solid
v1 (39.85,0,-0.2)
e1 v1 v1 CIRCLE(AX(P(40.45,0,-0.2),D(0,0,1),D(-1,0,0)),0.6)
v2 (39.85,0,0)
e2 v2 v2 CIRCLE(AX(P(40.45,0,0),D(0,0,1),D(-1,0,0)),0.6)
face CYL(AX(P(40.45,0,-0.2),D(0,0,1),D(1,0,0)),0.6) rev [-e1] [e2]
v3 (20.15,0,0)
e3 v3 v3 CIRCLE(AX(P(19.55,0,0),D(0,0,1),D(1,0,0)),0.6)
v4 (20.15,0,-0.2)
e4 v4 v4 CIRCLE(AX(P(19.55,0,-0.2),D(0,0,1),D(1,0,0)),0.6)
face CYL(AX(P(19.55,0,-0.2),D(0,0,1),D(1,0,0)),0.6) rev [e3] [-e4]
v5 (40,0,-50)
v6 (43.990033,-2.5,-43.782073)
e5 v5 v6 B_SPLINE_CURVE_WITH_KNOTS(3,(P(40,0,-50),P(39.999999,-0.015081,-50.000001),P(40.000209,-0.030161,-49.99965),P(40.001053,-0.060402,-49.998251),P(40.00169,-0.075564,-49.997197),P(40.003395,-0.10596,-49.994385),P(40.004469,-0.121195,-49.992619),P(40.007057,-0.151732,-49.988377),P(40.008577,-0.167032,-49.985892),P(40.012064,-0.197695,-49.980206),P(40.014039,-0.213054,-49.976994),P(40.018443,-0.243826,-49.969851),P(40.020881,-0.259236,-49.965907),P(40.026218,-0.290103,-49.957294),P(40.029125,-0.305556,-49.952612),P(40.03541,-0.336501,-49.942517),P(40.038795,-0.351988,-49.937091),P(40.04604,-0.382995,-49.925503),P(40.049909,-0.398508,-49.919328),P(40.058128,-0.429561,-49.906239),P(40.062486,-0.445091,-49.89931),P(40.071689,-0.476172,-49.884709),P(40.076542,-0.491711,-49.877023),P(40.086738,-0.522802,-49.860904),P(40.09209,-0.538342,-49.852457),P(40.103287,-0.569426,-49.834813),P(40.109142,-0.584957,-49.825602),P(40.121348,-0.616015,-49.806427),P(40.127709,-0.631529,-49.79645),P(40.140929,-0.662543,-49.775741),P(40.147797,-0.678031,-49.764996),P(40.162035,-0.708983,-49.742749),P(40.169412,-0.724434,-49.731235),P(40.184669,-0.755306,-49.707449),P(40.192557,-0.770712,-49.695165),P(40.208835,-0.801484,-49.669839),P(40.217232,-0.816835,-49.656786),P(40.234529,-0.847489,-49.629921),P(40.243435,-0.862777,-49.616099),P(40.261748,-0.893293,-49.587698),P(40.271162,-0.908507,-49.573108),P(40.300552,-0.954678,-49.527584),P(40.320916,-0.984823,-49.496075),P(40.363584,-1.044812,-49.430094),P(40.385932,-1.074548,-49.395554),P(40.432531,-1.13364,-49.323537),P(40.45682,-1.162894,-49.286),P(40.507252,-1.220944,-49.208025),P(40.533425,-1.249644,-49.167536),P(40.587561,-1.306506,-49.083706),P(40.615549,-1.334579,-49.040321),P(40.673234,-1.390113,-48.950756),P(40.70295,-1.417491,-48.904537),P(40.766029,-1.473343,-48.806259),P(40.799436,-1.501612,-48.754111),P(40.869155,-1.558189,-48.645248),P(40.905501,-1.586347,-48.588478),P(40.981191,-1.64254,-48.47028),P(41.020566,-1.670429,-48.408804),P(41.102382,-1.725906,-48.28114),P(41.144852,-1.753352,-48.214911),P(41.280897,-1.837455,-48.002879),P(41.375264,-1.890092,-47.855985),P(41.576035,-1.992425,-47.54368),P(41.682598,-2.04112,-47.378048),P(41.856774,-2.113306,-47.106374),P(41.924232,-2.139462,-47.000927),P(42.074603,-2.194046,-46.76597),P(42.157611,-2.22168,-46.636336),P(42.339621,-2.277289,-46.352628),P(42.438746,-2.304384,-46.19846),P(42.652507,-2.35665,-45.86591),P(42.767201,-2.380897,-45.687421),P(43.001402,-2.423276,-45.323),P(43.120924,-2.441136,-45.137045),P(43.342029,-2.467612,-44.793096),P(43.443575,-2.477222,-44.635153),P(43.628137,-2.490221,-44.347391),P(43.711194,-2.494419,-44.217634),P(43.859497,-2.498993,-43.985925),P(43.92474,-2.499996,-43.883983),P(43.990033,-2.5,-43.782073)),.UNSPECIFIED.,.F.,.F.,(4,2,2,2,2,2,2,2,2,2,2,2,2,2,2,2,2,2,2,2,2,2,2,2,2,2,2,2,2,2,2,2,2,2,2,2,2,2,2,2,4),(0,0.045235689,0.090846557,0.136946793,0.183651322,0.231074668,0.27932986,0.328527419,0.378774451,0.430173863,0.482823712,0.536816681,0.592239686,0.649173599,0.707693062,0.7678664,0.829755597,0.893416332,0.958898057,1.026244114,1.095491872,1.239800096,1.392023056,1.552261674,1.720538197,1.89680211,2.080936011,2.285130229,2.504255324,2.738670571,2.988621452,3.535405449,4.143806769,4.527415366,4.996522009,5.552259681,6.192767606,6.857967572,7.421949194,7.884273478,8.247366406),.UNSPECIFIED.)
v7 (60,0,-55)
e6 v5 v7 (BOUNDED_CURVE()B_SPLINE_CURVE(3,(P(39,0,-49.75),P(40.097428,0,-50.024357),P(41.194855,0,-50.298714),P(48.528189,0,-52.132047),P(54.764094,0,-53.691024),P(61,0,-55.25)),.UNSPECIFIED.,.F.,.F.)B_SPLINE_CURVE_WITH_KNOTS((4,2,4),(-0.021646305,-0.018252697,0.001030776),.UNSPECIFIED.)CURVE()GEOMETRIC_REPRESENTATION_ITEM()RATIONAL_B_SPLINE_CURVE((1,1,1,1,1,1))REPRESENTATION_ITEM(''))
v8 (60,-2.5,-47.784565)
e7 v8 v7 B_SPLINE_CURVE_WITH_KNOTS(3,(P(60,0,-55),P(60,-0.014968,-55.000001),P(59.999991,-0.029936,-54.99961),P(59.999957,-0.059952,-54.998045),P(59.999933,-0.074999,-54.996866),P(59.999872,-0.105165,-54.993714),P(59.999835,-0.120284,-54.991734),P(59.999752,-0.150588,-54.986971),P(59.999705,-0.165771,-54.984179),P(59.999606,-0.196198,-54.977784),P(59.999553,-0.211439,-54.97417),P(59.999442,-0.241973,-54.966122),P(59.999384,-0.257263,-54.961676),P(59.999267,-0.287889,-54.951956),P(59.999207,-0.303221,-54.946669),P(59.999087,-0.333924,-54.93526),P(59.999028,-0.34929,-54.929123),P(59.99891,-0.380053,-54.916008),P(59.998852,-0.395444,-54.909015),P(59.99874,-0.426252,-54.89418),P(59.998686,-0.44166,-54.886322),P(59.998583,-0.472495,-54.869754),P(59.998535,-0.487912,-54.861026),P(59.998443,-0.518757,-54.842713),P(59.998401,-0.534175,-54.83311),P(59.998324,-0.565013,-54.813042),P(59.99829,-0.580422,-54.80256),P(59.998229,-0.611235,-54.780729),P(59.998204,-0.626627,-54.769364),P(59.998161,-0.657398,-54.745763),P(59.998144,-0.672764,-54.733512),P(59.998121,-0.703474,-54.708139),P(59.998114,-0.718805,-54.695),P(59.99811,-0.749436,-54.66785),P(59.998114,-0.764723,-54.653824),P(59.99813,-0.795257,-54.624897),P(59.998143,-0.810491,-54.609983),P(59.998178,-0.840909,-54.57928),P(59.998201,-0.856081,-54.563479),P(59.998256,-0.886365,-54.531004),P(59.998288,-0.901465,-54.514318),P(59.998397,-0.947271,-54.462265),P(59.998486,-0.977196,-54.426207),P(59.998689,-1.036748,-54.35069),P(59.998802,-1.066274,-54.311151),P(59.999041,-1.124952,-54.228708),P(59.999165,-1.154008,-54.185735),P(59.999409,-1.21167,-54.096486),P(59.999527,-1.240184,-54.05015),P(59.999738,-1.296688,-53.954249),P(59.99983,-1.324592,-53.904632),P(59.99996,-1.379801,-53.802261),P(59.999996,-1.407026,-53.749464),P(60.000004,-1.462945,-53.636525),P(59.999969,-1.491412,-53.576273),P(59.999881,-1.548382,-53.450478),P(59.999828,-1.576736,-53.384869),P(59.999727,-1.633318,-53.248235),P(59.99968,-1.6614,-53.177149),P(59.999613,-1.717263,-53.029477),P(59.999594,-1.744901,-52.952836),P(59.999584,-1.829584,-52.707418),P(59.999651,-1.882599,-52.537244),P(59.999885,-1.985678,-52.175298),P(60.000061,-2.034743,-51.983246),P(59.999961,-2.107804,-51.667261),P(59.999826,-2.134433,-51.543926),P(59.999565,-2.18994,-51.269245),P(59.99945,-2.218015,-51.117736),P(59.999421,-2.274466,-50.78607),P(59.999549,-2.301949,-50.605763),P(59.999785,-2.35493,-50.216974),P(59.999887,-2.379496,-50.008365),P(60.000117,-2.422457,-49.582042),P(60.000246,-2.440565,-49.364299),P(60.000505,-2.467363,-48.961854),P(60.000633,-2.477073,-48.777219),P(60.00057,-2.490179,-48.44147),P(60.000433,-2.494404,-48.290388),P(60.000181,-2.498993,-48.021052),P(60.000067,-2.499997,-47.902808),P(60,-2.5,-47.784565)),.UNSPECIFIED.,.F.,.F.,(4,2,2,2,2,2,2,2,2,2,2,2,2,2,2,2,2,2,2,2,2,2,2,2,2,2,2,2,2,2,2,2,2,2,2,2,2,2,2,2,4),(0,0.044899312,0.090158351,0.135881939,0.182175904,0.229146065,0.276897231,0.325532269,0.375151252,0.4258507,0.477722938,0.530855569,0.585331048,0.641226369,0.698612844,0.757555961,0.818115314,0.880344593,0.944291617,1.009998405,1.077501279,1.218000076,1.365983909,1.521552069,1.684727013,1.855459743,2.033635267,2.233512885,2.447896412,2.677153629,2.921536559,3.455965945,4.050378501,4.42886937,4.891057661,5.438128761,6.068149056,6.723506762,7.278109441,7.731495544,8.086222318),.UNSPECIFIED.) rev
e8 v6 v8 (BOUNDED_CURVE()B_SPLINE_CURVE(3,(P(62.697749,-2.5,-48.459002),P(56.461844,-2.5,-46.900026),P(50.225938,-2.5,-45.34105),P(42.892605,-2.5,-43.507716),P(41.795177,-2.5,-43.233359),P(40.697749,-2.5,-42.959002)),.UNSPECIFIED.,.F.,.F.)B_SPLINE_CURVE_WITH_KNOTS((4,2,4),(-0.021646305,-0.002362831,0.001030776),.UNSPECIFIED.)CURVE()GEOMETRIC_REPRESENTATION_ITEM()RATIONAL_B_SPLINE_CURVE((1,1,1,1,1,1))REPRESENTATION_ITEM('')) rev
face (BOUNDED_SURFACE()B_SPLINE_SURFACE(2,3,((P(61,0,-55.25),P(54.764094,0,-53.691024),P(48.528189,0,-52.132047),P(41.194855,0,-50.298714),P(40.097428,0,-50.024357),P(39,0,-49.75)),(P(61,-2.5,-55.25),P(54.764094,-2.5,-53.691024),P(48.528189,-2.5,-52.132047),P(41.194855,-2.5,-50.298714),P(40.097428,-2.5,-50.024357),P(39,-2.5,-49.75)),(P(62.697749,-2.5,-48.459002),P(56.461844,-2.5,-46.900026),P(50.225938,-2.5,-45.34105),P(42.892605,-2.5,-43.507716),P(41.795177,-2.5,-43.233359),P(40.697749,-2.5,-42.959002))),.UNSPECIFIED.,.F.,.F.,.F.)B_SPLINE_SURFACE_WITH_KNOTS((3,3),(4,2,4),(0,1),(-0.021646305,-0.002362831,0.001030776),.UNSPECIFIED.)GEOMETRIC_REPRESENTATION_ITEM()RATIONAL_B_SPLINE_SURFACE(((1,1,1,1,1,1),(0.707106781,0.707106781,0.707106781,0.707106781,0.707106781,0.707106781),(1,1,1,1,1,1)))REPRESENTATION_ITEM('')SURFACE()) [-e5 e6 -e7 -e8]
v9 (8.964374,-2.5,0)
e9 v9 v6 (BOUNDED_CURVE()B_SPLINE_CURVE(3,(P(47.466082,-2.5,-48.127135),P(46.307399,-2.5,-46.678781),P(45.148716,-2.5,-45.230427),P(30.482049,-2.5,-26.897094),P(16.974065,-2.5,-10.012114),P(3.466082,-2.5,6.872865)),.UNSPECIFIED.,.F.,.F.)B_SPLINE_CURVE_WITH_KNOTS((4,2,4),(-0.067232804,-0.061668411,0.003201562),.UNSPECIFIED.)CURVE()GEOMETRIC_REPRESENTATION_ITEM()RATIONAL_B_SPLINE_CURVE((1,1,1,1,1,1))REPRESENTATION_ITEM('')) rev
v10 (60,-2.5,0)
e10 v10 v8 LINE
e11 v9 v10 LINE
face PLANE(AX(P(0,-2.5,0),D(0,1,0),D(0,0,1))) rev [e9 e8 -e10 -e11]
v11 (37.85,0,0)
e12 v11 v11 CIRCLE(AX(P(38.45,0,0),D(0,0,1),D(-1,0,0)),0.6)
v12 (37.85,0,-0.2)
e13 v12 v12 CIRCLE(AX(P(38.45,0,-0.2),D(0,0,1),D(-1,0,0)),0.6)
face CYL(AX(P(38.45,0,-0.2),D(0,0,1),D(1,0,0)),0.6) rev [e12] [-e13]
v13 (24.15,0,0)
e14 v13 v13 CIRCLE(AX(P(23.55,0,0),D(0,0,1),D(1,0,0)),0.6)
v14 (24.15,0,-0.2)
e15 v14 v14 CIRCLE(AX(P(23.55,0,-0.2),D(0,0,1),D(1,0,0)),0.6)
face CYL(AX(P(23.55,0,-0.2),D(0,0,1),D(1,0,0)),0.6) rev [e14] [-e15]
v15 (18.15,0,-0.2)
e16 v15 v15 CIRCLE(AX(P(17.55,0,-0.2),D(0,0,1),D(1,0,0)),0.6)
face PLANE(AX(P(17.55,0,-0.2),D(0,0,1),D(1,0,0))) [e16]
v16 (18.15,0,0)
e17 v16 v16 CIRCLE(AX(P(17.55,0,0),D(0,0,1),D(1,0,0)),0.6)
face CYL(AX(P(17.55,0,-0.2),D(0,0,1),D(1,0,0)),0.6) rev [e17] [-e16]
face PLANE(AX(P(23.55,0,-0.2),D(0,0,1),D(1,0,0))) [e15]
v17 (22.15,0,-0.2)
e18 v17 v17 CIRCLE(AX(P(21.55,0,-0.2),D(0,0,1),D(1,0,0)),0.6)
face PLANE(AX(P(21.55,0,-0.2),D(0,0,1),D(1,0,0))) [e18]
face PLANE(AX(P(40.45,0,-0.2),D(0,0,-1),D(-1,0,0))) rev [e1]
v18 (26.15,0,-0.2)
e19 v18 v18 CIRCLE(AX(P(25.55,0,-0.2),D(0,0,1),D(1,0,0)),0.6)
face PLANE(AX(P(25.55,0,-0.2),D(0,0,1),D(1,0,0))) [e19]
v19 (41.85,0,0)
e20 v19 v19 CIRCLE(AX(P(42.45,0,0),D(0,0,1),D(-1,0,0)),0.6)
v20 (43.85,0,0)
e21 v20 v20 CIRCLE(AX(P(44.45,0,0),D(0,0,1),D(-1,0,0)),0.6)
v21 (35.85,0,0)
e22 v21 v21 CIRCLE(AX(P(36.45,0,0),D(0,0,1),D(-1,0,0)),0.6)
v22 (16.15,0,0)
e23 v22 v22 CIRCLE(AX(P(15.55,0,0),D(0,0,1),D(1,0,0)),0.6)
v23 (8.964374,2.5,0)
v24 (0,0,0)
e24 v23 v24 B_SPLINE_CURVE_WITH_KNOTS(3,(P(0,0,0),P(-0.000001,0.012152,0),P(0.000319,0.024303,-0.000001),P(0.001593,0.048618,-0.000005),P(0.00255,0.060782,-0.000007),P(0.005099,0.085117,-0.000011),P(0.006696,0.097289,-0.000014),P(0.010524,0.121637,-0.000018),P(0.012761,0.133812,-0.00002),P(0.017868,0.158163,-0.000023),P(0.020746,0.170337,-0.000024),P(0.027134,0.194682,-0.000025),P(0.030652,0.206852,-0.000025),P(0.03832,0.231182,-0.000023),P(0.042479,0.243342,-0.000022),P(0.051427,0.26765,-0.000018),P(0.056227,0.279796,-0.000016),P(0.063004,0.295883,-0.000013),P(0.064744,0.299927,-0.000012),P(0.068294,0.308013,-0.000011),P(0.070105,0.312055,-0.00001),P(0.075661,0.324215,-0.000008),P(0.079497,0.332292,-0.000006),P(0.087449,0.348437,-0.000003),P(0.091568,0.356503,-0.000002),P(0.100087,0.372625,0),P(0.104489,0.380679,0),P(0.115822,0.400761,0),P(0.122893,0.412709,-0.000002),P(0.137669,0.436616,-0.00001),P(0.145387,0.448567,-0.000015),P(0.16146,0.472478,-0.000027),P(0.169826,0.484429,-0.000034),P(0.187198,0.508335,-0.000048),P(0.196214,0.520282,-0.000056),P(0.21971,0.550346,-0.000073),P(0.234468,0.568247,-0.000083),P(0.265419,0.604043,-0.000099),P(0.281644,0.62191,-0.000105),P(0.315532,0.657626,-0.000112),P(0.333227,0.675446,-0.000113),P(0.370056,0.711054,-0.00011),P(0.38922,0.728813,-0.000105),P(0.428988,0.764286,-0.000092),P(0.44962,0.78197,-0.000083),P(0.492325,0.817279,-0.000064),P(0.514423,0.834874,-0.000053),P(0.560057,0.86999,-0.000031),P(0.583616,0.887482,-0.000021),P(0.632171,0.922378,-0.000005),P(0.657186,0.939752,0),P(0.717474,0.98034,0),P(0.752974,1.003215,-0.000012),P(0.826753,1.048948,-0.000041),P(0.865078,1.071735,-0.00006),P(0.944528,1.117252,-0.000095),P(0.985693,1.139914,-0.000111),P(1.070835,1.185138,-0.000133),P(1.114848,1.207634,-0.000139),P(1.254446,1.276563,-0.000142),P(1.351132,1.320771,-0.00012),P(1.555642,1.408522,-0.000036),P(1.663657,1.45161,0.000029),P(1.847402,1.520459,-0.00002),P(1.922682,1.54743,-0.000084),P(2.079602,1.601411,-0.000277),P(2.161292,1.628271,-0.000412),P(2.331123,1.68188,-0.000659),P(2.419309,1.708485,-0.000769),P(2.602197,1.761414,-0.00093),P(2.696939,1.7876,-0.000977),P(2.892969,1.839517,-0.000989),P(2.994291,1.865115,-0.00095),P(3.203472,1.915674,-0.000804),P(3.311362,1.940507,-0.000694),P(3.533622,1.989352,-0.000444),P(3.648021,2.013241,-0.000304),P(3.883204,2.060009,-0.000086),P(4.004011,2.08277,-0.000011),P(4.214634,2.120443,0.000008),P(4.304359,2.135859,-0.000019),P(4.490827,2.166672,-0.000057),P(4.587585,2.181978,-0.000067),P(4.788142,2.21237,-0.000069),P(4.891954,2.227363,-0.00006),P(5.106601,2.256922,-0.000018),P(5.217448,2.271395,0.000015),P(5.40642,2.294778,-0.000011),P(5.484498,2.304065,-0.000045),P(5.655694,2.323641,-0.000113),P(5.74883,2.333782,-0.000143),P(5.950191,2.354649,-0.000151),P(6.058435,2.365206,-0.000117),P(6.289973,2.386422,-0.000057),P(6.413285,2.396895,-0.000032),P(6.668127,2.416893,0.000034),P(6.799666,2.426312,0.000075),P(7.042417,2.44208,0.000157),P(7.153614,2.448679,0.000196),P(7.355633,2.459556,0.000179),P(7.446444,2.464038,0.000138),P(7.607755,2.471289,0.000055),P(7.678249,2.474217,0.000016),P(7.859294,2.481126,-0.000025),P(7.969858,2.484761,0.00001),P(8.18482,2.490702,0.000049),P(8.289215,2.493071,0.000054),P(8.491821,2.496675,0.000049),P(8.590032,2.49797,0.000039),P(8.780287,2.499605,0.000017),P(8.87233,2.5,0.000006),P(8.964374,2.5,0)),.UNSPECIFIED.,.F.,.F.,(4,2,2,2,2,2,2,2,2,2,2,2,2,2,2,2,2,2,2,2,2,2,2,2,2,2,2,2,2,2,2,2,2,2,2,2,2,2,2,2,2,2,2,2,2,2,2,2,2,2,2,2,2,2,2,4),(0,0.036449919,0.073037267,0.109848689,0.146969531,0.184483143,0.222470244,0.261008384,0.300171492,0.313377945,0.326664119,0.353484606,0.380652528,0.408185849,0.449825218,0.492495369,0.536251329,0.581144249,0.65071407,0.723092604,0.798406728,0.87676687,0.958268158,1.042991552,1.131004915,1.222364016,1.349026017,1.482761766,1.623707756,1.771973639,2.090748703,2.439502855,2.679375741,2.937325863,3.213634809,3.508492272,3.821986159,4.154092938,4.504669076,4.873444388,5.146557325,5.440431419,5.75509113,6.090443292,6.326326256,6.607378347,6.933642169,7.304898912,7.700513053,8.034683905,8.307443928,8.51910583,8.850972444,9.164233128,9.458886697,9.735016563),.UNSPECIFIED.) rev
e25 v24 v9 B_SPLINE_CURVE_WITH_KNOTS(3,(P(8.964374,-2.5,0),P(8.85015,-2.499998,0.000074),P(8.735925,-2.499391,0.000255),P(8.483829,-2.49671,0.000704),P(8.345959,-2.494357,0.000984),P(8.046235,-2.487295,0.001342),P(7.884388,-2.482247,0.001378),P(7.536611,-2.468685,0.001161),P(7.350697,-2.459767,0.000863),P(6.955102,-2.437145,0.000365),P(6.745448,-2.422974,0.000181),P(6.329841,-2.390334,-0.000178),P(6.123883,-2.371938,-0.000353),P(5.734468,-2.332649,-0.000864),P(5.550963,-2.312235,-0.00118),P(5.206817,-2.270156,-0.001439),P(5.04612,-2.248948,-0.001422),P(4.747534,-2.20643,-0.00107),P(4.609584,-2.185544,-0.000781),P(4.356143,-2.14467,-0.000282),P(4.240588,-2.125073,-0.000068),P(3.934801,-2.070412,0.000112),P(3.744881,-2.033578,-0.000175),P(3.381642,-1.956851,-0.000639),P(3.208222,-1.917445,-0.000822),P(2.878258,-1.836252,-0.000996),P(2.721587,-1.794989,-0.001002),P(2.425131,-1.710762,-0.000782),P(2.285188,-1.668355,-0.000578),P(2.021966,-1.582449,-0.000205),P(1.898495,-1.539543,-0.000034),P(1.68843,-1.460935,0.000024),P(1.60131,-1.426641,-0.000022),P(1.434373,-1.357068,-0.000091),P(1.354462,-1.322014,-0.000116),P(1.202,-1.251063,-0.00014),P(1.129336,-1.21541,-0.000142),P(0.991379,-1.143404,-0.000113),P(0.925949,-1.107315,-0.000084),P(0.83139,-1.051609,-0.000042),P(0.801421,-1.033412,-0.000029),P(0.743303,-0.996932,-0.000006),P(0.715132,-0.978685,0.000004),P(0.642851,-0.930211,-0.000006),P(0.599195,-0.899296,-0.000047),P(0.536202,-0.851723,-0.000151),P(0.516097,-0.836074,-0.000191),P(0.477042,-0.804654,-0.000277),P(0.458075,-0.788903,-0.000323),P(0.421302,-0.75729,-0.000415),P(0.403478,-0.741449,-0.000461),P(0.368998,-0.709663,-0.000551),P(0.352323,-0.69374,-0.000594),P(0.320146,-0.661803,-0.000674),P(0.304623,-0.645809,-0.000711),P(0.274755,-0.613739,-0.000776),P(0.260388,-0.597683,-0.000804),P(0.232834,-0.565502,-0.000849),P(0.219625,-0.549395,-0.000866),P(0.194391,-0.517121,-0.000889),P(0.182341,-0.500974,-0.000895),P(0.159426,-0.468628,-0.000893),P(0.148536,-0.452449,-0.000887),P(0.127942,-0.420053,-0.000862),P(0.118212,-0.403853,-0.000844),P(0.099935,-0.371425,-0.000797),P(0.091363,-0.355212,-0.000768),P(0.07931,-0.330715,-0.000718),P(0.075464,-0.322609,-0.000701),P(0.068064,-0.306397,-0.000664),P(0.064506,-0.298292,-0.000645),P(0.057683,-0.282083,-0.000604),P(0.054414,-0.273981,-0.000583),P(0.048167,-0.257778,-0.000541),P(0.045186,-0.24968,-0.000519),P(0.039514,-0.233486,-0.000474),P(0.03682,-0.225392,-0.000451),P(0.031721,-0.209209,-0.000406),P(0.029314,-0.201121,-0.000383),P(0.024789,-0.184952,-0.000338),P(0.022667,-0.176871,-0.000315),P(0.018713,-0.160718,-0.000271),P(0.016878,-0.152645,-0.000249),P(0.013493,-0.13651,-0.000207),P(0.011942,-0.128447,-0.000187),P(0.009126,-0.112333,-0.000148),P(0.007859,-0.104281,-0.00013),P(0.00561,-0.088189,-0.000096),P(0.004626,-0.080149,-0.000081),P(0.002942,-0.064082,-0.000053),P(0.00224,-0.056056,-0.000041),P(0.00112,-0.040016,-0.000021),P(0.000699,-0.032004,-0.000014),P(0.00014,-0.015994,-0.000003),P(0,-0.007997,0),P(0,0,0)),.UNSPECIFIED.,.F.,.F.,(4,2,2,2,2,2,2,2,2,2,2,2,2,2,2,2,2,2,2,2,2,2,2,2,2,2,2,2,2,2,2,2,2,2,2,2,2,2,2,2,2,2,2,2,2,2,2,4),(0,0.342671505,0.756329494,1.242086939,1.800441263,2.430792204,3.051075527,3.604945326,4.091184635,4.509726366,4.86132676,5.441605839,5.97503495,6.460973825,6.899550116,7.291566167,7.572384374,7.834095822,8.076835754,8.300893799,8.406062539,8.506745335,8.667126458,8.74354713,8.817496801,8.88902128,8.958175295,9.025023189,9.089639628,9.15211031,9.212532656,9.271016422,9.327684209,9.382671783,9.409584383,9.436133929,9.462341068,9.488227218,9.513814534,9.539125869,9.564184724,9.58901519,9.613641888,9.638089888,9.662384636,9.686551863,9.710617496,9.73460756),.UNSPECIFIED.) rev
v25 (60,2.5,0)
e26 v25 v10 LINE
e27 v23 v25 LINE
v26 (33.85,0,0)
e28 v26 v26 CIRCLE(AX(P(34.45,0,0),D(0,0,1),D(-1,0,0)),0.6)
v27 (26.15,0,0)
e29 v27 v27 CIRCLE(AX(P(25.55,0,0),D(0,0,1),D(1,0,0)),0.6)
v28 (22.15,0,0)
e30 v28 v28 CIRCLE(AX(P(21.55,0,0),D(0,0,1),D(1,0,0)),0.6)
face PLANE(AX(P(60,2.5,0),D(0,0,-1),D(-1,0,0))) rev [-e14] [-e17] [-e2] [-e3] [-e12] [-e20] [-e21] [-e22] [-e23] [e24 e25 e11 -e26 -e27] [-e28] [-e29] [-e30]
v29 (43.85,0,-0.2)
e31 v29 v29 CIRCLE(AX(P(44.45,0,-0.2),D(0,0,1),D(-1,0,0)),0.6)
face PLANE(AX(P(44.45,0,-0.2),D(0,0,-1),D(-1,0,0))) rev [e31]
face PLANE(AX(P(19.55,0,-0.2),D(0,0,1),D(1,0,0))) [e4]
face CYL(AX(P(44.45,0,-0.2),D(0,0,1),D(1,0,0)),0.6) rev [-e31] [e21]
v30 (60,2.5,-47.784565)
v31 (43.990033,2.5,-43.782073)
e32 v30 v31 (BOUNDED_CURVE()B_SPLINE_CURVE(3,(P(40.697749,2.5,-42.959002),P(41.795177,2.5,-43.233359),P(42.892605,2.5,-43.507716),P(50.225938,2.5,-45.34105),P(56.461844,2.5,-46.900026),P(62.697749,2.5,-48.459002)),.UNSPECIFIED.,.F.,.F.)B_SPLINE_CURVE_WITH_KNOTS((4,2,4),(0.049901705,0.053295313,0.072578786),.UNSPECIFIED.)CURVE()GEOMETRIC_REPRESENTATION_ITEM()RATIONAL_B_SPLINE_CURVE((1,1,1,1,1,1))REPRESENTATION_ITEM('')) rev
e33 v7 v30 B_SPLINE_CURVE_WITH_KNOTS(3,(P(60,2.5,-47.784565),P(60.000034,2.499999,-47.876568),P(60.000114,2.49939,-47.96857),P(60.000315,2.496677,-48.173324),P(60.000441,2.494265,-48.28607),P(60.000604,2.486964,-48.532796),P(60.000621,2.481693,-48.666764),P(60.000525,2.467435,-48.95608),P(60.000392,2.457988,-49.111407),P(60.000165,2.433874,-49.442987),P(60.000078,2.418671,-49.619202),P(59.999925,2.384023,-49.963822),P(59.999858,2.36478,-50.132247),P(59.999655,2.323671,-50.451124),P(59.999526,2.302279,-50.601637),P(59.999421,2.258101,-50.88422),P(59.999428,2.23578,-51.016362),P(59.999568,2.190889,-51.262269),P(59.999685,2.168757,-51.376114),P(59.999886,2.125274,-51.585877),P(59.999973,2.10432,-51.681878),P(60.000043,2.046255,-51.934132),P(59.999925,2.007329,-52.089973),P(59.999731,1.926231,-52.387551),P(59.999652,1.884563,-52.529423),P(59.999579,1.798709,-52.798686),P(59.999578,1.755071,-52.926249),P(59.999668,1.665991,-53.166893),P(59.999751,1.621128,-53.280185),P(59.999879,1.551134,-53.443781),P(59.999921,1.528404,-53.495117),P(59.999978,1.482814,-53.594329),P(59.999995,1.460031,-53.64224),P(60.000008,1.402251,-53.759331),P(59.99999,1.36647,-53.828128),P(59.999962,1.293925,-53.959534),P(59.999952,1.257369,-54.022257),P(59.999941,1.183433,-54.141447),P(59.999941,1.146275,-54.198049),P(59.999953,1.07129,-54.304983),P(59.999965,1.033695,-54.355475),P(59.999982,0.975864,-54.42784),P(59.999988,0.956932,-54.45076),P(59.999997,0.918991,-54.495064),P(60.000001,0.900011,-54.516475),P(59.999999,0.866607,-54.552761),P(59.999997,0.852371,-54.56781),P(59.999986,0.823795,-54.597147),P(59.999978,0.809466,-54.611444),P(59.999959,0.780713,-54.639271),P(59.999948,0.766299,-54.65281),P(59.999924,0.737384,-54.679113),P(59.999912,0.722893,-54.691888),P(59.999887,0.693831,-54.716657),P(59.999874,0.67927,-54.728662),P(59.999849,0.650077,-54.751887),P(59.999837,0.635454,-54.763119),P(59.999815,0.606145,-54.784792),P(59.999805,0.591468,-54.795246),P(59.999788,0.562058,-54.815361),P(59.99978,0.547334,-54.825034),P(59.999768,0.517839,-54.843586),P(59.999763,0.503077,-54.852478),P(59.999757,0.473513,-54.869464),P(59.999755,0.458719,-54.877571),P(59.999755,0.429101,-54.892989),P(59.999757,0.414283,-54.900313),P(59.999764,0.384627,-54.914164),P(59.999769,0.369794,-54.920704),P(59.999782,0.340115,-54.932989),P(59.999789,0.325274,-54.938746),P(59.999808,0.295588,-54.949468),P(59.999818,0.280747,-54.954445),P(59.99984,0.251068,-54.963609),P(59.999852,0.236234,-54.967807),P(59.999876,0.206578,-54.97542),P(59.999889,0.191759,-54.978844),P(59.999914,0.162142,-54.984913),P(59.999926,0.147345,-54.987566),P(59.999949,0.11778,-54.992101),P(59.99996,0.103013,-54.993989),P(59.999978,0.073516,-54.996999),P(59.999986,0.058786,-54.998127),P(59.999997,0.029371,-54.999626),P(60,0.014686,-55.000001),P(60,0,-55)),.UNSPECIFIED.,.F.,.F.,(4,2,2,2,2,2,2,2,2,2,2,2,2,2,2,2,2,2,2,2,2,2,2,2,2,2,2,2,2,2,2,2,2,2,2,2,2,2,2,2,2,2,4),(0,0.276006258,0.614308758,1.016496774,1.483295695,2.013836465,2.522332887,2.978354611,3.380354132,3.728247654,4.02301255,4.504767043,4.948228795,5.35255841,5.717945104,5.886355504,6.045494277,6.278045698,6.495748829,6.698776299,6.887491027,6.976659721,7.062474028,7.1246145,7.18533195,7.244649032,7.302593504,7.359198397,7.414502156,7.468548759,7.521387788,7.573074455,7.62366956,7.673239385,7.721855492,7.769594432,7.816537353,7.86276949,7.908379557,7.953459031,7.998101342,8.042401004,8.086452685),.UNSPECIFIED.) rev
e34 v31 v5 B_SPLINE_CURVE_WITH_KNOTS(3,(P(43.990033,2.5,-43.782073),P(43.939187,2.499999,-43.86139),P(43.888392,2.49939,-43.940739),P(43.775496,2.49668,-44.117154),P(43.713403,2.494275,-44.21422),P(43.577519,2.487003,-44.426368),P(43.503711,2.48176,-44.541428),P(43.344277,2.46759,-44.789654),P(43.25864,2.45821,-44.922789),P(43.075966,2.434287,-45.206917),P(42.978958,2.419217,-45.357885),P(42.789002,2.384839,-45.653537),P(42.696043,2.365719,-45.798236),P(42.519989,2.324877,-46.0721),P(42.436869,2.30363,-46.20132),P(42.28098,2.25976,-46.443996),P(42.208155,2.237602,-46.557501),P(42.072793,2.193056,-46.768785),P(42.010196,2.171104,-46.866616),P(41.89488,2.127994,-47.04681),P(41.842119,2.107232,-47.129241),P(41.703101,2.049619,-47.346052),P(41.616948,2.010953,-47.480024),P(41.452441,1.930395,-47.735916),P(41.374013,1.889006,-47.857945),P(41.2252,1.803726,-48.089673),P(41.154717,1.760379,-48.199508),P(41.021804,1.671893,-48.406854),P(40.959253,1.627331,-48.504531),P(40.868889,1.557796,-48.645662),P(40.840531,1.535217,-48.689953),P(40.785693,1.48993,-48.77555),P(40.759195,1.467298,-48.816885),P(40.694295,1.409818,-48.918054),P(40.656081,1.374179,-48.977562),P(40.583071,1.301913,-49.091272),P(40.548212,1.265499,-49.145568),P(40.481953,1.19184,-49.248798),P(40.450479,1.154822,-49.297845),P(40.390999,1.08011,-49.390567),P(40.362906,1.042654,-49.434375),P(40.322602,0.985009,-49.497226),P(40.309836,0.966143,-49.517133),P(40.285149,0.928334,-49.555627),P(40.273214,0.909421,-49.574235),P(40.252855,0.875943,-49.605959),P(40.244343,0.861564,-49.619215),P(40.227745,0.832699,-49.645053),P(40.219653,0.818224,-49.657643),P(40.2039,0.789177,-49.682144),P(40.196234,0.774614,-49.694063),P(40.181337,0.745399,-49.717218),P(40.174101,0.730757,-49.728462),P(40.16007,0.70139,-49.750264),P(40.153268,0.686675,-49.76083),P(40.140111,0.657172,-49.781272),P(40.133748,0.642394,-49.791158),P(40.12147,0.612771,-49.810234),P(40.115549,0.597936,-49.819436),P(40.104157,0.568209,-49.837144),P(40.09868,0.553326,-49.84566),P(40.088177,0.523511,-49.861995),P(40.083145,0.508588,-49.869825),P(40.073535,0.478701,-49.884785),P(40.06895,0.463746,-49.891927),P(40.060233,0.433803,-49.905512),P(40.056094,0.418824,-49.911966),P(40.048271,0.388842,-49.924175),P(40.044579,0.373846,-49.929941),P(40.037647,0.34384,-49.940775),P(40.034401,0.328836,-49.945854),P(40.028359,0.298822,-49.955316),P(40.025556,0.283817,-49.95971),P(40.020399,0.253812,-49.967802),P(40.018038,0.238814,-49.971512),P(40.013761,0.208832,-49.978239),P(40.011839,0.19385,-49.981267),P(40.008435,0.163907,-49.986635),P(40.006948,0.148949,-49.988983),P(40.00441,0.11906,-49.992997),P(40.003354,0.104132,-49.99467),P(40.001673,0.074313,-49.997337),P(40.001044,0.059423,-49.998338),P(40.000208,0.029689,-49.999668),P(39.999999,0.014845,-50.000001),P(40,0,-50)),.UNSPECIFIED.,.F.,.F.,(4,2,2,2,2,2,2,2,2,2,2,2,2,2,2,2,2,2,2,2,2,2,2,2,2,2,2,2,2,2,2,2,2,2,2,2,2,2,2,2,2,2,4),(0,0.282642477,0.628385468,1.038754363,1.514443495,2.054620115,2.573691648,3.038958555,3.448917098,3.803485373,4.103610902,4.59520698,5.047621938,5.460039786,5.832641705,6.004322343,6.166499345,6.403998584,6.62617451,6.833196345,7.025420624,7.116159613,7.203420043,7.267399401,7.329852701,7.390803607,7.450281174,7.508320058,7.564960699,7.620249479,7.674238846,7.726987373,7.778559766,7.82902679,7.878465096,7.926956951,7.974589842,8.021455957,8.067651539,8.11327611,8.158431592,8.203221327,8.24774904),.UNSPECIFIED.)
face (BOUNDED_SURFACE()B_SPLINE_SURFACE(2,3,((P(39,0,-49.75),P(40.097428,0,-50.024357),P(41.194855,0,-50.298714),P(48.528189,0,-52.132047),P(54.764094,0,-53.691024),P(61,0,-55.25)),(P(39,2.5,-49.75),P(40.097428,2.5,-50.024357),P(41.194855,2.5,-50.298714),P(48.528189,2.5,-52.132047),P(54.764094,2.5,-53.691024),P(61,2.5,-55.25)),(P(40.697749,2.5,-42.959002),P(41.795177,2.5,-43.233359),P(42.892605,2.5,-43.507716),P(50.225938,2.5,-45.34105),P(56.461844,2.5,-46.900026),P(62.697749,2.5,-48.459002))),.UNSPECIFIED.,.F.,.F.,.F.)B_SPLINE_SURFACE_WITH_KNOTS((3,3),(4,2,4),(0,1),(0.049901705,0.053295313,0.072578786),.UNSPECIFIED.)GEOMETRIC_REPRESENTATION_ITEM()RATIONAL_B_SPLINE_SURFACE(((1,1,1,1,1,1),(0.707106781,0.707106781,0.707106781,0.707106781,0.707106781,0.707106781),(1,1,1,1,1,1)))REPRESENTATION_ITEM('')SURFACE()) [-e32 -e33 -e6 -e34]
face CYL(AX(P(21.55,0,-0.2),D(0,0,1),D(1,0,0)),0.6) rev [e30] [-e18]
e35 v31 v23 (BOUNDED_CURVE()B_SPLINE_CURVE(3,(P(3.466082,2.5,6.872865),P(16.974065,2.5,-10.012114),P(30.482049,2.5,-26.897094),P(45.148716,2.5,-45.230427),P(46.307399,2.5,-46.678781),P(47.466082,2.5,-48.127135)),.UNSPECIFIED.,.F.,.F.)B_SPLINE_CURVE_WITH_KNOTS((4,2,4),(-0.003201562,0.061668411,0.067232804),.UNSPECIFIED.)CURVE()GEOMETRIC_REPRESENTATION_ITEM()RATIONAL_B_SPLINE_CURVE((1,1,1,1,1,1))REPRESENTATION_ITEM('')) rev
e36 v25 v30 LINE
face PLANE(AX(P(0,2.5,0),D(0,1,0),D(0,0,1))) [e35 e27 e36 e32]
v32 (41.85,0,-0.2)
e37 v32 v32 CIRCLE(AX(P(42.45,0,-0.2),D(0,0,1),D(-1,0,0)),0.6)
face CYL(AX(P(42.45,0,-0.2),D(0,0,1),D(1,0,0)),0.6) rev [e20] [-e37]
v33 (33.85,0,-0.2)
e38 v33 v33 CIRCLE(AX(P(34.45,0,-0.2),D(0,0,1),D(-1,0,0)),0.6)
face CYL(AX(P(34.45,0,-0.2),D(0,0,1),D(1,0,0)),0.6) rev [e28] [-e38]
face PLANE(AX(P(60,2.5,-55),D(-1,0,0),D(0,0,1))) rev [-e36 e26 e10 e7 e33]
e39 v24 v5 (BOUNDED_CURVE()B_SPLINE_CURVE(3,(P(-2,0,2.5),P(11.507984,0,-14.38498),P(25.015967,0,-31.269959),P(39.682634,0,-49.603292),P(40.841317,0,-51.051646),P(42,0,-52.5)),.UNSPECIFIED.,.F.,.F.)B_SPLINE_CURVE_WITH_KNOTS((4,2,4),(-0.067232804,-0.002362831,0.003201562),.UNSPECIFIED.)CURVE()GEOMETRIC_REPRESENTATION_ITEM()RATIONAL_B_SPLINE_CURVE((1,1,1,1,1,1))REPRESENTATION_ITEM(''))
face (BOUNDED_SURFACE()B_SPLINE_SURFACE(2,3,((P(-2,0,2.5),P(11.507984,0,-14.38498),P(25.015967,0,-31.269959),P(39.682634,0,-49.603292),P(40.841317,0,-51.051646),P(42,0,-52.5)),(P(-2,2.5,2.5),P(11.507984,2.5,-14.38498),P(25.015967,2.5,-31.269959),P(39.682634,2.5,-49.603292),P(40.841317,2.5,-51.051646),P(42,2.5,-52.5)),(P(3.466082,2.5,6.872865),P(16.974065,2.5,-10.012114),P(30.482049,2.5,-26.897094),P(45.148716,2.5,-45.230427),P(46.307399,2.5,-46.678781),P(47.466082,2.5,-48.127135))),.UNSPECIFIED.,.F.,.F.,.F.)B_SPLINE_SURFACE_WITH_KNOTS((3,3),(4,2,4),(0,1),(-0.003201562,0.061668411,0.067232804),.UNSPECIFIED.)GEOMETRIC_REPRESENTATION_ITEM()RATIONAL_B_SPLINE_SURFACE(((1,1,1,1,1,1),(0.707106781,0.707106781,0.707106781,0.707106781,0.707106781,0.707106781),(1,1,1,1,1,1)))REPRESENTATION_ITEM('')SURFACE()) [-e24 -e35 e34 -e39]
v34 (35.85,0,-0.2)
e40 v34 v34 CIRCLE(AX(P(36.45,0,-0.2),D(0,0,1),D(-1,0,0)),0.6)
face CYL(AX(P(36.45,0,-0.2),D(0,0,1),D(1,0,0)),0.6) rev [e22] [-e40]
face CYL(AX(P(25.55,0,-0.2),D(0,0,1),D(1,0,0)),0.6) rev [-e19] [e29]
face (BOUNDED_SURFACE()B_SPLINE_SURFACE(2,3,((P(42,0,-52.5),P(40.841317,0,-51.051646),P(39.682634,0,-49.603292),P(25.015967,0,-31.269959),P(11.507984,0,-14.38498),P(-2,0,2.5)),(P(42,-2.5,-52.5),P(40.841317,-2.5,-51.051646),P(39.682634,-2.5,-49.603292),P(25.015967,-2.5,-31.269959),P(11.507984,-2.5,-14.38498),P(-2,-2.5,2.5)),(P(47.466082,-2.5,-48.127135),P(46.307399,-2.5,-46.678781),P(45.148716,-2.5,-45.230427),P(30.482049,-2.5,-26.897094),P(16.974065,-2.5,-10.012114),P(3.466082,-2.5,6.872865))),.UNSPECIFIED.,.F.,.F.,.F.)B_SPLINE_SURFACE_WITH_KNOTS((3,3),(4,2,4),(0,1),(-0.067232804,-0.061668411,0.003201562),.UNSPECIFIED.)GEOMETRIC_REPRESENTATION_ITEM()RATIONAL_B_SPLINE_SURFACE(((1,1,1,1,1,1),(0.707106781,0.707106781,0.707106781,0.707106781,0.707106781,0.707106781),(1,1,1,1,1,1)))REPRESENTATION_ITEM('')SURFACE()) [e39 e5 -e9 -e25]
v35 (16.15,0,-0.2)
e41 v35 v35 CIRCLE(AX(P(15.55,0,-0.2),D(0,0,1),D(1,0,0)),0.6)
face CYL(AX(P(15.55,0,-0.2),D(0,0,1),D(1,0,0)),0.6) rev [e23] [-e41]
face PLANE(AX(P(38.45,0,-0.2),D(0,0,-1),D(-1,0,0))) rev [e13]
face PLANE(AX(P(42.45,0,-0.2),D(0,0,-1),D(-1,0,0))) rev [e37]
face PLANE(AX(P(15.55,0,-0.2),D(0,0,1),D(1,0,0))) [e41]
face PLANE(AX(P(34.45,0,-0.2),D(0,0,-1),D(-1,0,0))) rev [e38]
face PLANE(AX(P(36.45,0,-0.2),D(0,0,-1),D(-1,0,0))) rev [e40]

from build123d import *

# Parameters (mm, degrees)
BOSS_EXTRUDE1_DEPTH = 2.5
FILLET3_SIZE        = 2.5
FILLET3_SIZE_2      = 7
FILLET4_SIZE        = 2.5
FILLET4_SIZE_2      = 7
SKETCH2_R           = 0.6
CUT_EXTRUDE1_DEPTH  = 0.2


with BuildPart() as part:
    # Sketch1 → Boss-Extrude1 (new, symmetric)
    with BuildSketch(Plane(origin=(0, 0, 0), x_dir=(1, 0, 0), z_dir=(0, 1, 0))):
        Polygon((0, 0), (40, 50), (60, 55), (60, 0), align=None)
    extrude(amount=BOSS_EXTRUDE1_DEPTH, both=True)

    # Fillet3
    # an asymmetric fillet: 7, 2.5 mm, written as the material it takes off along each edge
    with BuildSketch(Plane(origin=(-10.932163332, 2.5, 13.665204165), x_dir=(0, -1, 0), z_dir=(0.6246950475544242, 0, -0.7808688094430304))) as fillet3_piece_1:
        with BuildLine():
            Bezier((FILLET3_SIZE, 0), (0, 0), (0, -FILLET3_SIZE_2), weights=[1, 0.707106781, 1])
            Line((0, -FILLET3_SIZE_2), (0, 0))
            Line((0, 0), (FILLET3_SIZE, 0))
        make_face()
    extrude(amount=99.031242374, mode=Mode.SUBTRACT)
    with BuildSketch(Plane(origin=(23.022506247, 2.5, -45.755626562), x_dir=(0.24253562503633289, 0, 0.970142500145332), z_dir=(0.970142500145332, 0, -0.2425356250363329))) as fillet3_piece_2:
        with BuildLine():
            Bezier((FILLET3_SIZE_2, 0), (0, 0), (0, FILLET3_SIZE), weights=[1, 0.707106781, 1])
            Line((0, FILLET3_SIZE), (0, 0))
            Line((0, 0), (FILLET3_SIZE_2, 0))
        make_face()
    extrude(amount=55.615528128, mode=Mode.SUBTRACT)

    # Fillet4
    # an asymmetric fillet: 7, 2.5 mm, written as the material it takes off along each edge
    with BuildSketch(Plane(origin=(-10.932163332, -2.5, 13.665204165), x_dir=(0, 1, 0), z_dir=(0.6246950475544242, 0, -0.7808688094430304))) as fillet4_piece_1:
        with BuildLine():
            Bezier((FILLET4_SIZE, 0), (0, 0), (0, FILLET4_SIZE_2), weights=[1, 0.707106781, 1])
            Line((0, FILLET4_SIZE_2), (0, 0))
            Line((0, 0), (FILLET4_SIZE, 0))
        make_face()
    extrude(amount=99.031242374, mode=Mode.SUBTRACT)
    with BuildSketch(Plane(origin=(23.022506247, -2.5, -45.755626562), x_dir=(0, 1, 0), z_dir=(0.970142500145332, 0, -0.2425356250363329))) as fillet4_piece_2:
        with BuildLine():
            Bezier((FILLET4_SIZE, 0), (0, 0), (0, FILLET4_SIZE_2), weights=[1, 0.707106781, 1])
            Line((0, FILLET4_SIZE_2), (0, 0))
            Line((0, 0), (FILLET4_SIZE, 0))
        make_face()
    extrude(amount=55.615528128, mode=Mode.SUBTRACT)

    # Sketch2 → Cut-Extrude1 (cut)
    with BuildSketch(Plane.XY):
        with Locations((15.55, 0)):
            Circle(SKETCH2_R)
        with Locations((17.55, 0)):
            Circle(SKETCH2_R)
        with Locations((19.55, 0)):
            Circle(SKETCH2_R)
        with Locations((21.55, 0)):
            Circle(SKETCH2_R)
        with Locations((23.55, 0)):
            Circle(SKETCH2_R)
        with Locations((25.55, 0)):
            Circle(SKETCH2_R)
        with Locations(Location((34.45, 0, 0), (0, 0, 180))):
            Circle(SKETCH2_R)
        with Locations(Location((36.45, 0, 0), (0, 0, 180))):
            Circle(SKETCH2_R)
        with Locations(Location((38.45, 0, 0), (0, 0, 180))):
            Circle(SKETCH2_R)
        with Locations(Location((40.45, 0, 0), (0, 0, 180))):
            Circle(SKETCH2_R)
        with Locations(Location((42.45, 0, 0), (0, 0, 180))):
            Circle(SKETCH2_R)
        with Locations(Location((44.45, 0, 0), (0, 0, 180))):
            Circle(SKETCH2_R)
    extrude(amount=-CUT_EXTRUDE1_DEPTH, mode=Mode.SUBTRACT)


solid = part.part
